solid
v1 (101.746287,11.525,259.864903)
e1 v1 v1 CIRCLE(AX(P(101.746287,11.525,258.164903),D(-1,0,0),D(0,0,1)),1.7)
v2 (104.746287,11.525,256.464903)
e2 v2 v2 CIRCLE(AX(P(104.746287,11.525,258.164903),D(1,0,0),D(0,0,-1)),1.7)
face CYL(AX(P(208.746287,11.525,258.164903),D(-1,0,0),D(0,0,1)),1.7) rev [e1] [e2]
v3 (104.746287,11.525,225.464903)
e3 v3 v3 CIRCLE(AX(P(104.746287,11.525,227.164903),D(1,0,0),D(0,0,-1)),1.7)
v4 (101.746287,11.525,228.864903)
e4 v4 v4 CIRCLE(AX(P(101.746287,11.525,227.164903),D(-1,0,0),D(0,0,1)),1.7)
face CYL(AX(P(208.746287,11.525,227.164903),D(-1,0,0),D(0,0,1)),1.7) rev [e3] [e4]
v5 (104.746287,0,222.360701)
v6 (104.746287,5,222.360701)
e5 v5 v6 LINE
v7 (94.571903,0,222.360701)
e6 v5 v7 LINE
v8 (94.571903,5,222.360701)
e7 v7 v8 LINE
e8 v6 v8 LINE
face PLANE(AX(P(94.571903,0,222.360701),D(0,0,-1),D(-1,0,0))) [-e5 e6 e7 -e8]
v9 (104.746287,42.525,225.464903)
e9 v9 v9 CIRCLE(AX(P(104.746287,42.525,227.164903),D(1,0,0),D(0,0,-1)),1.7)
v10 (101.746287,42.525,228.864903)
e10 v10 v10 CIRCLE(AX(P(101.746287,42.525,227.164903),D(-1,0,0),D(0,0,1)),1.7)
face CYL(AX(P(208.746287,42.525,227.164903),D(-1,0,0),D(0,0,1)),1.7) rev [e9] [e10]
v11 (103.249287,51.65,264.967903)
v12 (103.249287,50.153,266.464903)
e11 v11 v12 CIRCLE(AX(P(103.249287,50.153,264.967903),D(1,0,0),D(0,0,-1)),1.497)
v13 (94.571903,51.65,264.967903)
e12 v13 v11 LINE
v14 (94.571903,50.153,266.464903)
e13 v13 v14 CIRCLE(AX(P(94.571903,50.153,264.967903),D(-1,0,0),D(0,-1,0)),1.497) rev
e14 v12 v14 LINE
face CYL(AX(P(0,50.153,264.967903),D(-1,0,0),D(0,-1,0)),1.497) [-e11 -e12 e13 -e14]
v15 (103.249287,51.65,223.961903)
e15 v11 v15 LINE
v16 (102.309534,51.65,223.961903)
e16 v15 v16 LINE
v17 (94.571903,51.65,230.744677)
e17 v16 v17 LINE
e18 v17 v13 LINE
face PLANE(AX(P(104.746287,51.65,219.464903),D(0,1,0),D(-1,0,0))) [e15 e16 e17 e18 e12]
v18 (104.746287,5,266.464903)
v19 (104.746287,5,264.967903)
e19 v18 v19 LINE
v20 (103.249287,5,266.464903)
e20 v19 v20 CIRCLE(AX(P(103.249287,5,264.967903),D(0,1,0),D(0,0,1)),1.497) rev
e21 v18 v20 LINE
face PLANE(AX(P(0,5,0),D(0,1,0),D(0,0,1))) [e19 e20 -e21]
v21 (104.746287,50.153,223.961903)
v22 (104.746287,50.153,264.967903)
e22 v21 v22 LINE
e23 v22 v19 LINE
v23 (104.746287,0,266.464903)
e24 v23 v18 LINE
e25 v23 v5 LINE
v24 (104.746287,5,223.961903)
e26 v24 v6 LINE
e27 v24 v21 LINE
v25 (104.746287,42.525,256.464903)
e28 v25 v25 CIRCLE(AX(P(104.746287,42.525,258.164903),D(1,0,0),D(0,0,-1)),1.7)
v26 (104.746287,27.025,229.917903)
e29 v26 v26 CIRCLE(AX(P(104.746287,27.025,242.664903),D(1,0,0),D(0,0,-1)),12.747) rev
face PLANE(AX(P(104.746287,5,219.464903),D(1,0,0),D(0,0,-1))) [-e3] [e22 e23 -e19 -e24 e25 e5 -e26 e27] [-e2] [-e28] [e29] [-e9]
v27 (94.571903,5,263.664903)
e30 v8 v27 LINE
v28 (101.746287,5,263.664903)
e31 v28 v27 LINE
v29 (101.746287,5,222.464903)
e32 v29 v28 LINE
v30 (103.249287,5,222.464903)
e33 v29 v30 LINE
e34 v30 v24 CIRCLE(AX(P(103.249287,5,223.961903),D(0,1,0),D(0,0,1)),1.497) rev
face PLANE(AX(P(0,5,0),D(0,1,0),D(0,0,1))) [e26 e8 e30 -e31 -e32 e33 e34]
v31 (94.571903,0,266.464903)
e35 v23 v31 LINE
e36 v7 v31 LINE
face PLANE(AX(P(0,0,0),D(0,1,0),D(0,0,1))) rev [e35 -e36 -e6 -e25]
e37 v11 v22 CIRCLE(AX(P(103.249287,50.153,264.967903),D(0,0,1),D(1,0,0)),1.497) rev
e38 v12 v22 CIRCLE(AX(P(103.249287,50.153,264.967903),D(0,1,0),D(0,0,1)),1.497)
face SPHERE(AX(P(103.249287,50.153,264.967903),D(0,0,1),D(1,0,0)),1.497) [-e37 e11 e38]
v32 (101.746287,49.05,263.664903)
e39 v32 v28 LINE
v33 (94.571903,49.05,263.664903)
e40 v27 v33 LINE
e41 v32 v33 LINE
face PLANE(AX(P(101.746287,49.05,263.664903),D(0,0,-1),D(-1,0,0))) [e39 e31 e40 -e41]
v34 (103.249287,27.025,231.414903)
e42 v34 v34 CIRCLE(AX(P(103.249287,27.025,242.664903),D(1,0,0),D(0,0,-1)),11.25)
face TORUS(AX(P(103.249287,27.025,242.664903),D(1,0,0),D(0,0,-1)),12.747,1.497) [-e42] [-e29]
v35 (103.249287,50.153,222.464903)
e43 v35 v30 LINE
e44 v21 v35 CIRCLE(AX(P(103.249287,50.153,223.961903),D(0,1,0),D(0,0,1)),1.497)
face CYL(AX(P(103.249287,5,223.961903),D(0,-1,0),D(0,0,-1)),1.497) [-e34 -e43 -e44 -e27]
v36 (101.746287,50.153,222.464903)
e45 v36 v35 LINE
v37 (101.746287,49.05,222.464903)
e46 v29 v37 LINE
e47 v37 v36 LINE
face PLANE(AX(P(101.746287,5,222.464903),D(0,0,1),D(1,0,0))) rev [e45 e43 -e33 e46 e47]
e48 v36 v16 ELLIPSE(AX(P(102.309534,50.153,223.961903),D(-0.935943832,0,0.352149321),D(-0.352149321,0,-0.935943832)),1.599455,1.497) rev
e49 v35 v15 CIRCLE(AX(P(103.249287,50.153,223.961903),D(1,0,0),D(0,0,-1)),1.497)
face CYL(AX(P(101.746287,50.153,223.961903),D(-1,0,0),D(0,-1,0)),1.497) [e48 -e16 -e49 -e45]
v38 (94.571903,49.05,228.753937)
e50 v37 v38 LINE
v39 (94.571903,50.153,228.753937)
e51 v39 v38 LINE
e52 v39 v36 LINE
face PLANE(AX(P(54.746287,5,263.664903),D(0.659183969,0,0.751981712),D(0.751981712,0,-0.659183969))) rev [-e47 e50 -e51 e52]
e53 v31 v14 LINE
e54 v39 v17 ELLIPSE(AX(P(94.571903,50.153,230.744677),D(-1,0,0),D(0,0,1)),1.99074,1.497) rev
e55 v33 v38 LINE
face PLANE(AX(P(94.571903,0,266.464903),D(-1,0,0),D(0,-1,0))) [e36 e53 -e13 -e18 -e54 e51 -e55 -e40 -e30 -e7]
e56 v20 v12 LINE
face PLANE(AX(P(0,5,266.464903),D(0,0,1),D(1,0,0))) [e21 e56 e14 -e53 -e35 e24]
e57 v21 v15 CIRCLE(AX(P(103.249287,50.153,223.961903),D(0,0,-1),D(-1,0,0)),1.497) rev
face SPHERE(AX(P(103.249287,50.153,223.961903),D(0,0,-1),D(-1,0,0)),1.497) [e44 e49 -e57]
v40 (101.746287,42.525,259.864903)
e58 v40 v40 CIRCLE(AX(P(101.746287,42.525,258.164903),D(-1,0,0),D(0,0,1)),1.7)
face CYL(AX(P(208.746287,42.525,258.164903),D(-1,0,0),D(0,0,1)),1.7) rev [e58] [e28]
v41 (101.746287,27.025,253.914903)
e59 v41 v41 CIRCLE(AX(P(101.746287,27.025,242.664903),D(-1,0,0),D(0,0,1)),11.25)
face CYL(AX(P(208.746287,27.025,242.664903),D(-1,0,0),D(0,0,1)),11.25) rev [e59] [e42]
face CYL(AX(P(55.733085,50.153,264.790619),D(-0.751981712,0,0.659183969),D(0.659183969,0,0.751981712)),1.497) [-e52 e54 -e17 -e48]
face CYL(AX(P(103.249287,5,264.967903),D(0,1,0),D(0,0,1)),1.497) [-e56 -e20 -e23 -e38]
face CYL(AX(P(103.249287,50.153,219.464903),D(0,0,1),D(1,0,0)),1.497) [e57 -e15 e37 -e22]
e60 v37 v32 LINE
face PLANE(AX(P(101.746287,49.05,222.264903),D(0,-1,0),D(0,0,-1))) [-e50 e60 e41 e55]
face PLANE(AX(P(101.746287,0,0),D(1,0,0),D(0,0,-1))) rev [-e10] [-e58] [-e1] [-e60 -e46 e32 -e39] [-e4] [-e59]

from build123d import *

# Parameters (mm, degrees)
SKETCH_1_W            = 5
SKETCH_1_H            = 60
SKETCH_1_W_2          = 30
SKETCH_1_H_2          = 5
SKETCH_1_W_3          = 15
EXTRUDE_1_DEPTH       = 5
FILLET_1_R            = 5
SKETCH_2_W            = 245
SKETCH_2_H            = 125
CUT_EXTRUDE_1_DEPTH   = 5
SKETCH_3_W            = 110
SKETCH_3_H            = 2.5
SKETCH_3_W_2          = 115
CUT_EXTRUDE_2_DEPTH   = 10
SKETCH_4_W            = 5
SKETCH_4_H            = 5
CUT_EXTRUDE_3_DEPTH   = 5
SKETCH_5_W            = 50
SKETCH_5_H            = 46.65
EXTRUDE_2_DEPTH       = 47
SKETCH_6_W            = 41.4
SKETCH_6_H            = 44.05
CUT_EXTRUDE_4_DEPTH   = 47
SKETCH_7_R            = 11.25
CUT_EXTRUDE_5_DEPTH   = 317.004529962
CUT_EXTRUDE_6_DEPTH   = 46.65
SKETCH_10_R           = 1.7
CUT_EXTRUDE_7_DEPTH   = 317.004529962
SKETCH_13_R           = 25
CUT_EXTRUDE_9_DEPTH   = 20
FILLET_11_R           = 1.497
SKETCH_17_OUTSIDE_W   = 295.14
SKETCH_17_OUTSIDE_H   = 275.14
SKETCH_17_OUTSIDE_W_2 = 10.174383679
SKETCH_17_OUTSIDE_H_2 = 44.104202059
CUT_EXTRUDE_11_DEPTH  = 359.196699


with BuildPart() as part:
    # 草圖1 → 填料-伸長1 (new body)
    with BuildSketch(Plane(origin=(0, 0, 0), x_dir=(1, 0, 0), z_dir=(0, 1, 0))):
        Polygon((198.746286718, -286.464902661), (198.746286718, -256.464902661), (183.246286718, -256.464902661), (183.246286718, -266.464902661), (124.746286718, -266.464902661), (124.746286718, -262.464902661), (109.246286718, -262.464902661), (109.246286718, -266.464902661), (-21.253713282, -266.464902661), (-21.253713282, 38.535097339), (-36.253713282, 38.535097339), (-36.253713282, 43.535097339), (203.746286718, 43.535097339), (203.746286718, -286.464902661), align=None)
        with Locations((206.246286718, -256.464902661)):
            Rectangle(SKETCH_1_W, SKETCH_1_H)
        with Locations((206.246286718, 13.535097339)):
            Rectangle(SKETCH_1_W, SKETCH_1_H)
        with Locations((188.746286718, 46.035097339)):
            Rectangle(SKETCH_1_W_2, SKETCH_1_H_2)
        with Locations((-21.253713282, 46.035097339)):
            Rectangle(SKETCH_1_W_2, SKETCH_1_H_2)
        with Locations((91.246286718, 46.035097339)):
            Rectangle(SKETCH_1_W_3, SKETCH_1_H_2)
        with Locations((76.246286718, 46.035097339)):
            Rectangle(SKETCH_1_W_3, SKETCH_1_H_2)
        with Locations((206.246286718, -166.464902661)):
            Rectangle(SKETCH_1_W, SKETCH_1_H)
        with Locations((206.246286718, -76.464902661)):
            Rectangle(SKETCH_1_W, SKETCH_1_H)
    extrude(amount=EXTRUDE_1_DEPTH)

    # 圓角1
    fillet_1_edges = [part.edges().sort_by_distance(p)[0] for p in [
        (208.746286718, 5, -13.535097339),
        (208.746286718, 5, 76.464902661),
        (208.746286718, 5, 166.464902661),
        (208.746286718, 5, 256.464902661),
    ]]
    fillet(fillet_1_edges, radius=FILLET_1_R - 0.0001)  # a hair under: the kernel refuses the full size

    # 草圖2 → 除料-伸長1 (cut)
    with BuildSketch(Plane(origin=(0, 5, 0), x_dir=(1, 0, 0), z_dir=(0, 1, 0))):
        with Locations((86.246286718, -13.964902661)):
            Rectangle(SKETCH_2_W, SKETCH_2_H)
    extrude(amount=-CUT_EXTRUDE_1_DEPTH, mode=Mode.SUBTRACT)

    # 草圖3 → 除料-伸長2 (cut)
    with BuildSketch(Plane(origin=(0, 0, 76.464902661), x_dir=(-1, 0, 0), z_dir=(0, 0, -1))):
        with Locations((-33.746286718, 1.25)):
            Rectangle(SKETCH_3_W, SKETCH_3_H)
        with Locations((-151.246286718, 3.75)):
            Rectangle(SKETCH_3_W_2, SKETCH_3_H)
    extrude(amount=-CUT_EXTRUDE_2_DEPTH, mode=Mode.SUBTRACT)

    # 草圖4 → 除料-伸長3 (cut)
    with BuildSketch(Plane(origin=(0, 0, 76.464902661), x_dir=(-1, 0, 0), z_dir=(0, 0, -1))):
        with Locations((-91.246286718, 2.5)):
            Rectangle(SKETCH_4_W, SKETCH_4_H)
    extrude(amount=-CUT_EXTRUDE_3_DEPTH, mode=Mode.SUBTRACT)

    # 草圖5 → 填料-伸長2 (add)
    with BuildSketch(Plane.XY.offset(266.464902661)):
        with Locations((79.746286718, 28.325)):
            Rectangle(SKETCH_5_W, SKETCH_5_H)
    extrude(amount=-EXTRUDE_2_DEPTH)

    # 草圖6 → 除料-伸長4 (cut)
    with BuildSketch(Plane.ZY.offset(-54.746286718)):
        with Locations((242.964902661, 27.025)):
            Rectangle(SKETCH_6_W, SKETCH_6_H)
    extrude(amount=-CUT_EXTRUDE_4_DEPTH, mode=Mode.SUBTRACT)

    # 草圖7 → 除料-伸長5 (cut, through all)
    with BuildSketch(Plane.ZY.offset(-101.746286718)):
        with Locations((242.664902661, 27.025)):
            Circle(SKETCH_7_R)
    extrude(amount=-CUT_EXTRUDE_5_DEPTH, mode=Mode.SUBTRACT)

    # 草圖8 → 除料-伸長6 (cut)
    with BuildSketch(Plane(origin=(0, 51.65, 0), x_dir=(1, 0, 0), z_dir=(0, 1, 0))):
        Polygon((54.746286718, -263.664902661), (101.746286718, -222.464902661), (104.746286718, -222.464902661), (104.746286718, -219.464902661), (54.746286718, -219.464902661), align=None)
    extrude(amount=-CUT_EXTRUDE_6_DEPTH, mode=Mode.SUBTRACT)

    # 草圖10 → 除料-伸長7 (cut, through all)
    with BuildSketch(Plane.ZY.offset(-101.746286718)):
        with Locations((227.164902661, 42.525)):
            Circle(SKETCH_10_R)
        with Locations((258.164902661, 42.525)):
            Circle(SKETCH_10_R)
        with Locations((258.164902661, 11.525)):
            Circle(SKETCH_10_R)
        with Locations((227.164902661, 11.525)):
            Circle(SKETCH_10_R)
    extrude(amount=-CUT_EXTRUDE_7_DEPTH, mode=Mode.SUBTRACT)

    # 草圖13 → 除料-伸長9 (cut)
    with BuildSketch(Plane(origin=(104.746286718, 0, 0), x_dir=(0, 0, -1), z_dir=(1, 0, 0))):
        with Locations((-242.664902661, 27.025)):
            Circle(SKETCH_13_R)
    extrude(amount=CUT_EXTRUDE_9_DEPTH, mode=Mode.SUBTRACT)

    # 圓角11
    fillet_11_edges = [part.edges().sort_by_distance(p)[0] for p in [
        (54.746286718, 28.325, 266.464902661),
        (79.746286718, 51.65, 266.464902661),
        (104.746286718, 28.325, 266.464902661),
        (104.746286718, 27.025, 231.414902661),
        (54.746286718, 51.65, 265.064902661),
        (104.746286718, 51.65, 244.464902661),
        (104.746286718, 28.325, 222.464902661),
        (78.246286718, 51.65, 243.064902661),
        (103.246286718, 51.65, 222.464902661),
    ]]
    fillet(fillet_11_edges, radius=FILLET_11_R)

    # 草圖17 outside → 除料-伸長11 (cut, through all)
    with BuildSketch(Plane(origin=(0, 51.65, 0), x_dir=(1, 0, 0), z_dir=(0, 1, 0))):
        with Locations((93.746, -181.465)):
            Rectangle(SKETCH_17_OUTSIDE_W, SKETCH_17_OUTSIDE_H)
        with Locations((99.659094879, -244.412801632)):
            Rectangle(SKETCH_17_OUTSIDE_W_2, SKETCH_17_OUTSIDE_H_2, mode=Mode.SUBTRACT)
    extrude(amount=-CUT_EXTRUDE_11_DEPTH, mode=Mode.SUBTRACT)


solid = part.part
